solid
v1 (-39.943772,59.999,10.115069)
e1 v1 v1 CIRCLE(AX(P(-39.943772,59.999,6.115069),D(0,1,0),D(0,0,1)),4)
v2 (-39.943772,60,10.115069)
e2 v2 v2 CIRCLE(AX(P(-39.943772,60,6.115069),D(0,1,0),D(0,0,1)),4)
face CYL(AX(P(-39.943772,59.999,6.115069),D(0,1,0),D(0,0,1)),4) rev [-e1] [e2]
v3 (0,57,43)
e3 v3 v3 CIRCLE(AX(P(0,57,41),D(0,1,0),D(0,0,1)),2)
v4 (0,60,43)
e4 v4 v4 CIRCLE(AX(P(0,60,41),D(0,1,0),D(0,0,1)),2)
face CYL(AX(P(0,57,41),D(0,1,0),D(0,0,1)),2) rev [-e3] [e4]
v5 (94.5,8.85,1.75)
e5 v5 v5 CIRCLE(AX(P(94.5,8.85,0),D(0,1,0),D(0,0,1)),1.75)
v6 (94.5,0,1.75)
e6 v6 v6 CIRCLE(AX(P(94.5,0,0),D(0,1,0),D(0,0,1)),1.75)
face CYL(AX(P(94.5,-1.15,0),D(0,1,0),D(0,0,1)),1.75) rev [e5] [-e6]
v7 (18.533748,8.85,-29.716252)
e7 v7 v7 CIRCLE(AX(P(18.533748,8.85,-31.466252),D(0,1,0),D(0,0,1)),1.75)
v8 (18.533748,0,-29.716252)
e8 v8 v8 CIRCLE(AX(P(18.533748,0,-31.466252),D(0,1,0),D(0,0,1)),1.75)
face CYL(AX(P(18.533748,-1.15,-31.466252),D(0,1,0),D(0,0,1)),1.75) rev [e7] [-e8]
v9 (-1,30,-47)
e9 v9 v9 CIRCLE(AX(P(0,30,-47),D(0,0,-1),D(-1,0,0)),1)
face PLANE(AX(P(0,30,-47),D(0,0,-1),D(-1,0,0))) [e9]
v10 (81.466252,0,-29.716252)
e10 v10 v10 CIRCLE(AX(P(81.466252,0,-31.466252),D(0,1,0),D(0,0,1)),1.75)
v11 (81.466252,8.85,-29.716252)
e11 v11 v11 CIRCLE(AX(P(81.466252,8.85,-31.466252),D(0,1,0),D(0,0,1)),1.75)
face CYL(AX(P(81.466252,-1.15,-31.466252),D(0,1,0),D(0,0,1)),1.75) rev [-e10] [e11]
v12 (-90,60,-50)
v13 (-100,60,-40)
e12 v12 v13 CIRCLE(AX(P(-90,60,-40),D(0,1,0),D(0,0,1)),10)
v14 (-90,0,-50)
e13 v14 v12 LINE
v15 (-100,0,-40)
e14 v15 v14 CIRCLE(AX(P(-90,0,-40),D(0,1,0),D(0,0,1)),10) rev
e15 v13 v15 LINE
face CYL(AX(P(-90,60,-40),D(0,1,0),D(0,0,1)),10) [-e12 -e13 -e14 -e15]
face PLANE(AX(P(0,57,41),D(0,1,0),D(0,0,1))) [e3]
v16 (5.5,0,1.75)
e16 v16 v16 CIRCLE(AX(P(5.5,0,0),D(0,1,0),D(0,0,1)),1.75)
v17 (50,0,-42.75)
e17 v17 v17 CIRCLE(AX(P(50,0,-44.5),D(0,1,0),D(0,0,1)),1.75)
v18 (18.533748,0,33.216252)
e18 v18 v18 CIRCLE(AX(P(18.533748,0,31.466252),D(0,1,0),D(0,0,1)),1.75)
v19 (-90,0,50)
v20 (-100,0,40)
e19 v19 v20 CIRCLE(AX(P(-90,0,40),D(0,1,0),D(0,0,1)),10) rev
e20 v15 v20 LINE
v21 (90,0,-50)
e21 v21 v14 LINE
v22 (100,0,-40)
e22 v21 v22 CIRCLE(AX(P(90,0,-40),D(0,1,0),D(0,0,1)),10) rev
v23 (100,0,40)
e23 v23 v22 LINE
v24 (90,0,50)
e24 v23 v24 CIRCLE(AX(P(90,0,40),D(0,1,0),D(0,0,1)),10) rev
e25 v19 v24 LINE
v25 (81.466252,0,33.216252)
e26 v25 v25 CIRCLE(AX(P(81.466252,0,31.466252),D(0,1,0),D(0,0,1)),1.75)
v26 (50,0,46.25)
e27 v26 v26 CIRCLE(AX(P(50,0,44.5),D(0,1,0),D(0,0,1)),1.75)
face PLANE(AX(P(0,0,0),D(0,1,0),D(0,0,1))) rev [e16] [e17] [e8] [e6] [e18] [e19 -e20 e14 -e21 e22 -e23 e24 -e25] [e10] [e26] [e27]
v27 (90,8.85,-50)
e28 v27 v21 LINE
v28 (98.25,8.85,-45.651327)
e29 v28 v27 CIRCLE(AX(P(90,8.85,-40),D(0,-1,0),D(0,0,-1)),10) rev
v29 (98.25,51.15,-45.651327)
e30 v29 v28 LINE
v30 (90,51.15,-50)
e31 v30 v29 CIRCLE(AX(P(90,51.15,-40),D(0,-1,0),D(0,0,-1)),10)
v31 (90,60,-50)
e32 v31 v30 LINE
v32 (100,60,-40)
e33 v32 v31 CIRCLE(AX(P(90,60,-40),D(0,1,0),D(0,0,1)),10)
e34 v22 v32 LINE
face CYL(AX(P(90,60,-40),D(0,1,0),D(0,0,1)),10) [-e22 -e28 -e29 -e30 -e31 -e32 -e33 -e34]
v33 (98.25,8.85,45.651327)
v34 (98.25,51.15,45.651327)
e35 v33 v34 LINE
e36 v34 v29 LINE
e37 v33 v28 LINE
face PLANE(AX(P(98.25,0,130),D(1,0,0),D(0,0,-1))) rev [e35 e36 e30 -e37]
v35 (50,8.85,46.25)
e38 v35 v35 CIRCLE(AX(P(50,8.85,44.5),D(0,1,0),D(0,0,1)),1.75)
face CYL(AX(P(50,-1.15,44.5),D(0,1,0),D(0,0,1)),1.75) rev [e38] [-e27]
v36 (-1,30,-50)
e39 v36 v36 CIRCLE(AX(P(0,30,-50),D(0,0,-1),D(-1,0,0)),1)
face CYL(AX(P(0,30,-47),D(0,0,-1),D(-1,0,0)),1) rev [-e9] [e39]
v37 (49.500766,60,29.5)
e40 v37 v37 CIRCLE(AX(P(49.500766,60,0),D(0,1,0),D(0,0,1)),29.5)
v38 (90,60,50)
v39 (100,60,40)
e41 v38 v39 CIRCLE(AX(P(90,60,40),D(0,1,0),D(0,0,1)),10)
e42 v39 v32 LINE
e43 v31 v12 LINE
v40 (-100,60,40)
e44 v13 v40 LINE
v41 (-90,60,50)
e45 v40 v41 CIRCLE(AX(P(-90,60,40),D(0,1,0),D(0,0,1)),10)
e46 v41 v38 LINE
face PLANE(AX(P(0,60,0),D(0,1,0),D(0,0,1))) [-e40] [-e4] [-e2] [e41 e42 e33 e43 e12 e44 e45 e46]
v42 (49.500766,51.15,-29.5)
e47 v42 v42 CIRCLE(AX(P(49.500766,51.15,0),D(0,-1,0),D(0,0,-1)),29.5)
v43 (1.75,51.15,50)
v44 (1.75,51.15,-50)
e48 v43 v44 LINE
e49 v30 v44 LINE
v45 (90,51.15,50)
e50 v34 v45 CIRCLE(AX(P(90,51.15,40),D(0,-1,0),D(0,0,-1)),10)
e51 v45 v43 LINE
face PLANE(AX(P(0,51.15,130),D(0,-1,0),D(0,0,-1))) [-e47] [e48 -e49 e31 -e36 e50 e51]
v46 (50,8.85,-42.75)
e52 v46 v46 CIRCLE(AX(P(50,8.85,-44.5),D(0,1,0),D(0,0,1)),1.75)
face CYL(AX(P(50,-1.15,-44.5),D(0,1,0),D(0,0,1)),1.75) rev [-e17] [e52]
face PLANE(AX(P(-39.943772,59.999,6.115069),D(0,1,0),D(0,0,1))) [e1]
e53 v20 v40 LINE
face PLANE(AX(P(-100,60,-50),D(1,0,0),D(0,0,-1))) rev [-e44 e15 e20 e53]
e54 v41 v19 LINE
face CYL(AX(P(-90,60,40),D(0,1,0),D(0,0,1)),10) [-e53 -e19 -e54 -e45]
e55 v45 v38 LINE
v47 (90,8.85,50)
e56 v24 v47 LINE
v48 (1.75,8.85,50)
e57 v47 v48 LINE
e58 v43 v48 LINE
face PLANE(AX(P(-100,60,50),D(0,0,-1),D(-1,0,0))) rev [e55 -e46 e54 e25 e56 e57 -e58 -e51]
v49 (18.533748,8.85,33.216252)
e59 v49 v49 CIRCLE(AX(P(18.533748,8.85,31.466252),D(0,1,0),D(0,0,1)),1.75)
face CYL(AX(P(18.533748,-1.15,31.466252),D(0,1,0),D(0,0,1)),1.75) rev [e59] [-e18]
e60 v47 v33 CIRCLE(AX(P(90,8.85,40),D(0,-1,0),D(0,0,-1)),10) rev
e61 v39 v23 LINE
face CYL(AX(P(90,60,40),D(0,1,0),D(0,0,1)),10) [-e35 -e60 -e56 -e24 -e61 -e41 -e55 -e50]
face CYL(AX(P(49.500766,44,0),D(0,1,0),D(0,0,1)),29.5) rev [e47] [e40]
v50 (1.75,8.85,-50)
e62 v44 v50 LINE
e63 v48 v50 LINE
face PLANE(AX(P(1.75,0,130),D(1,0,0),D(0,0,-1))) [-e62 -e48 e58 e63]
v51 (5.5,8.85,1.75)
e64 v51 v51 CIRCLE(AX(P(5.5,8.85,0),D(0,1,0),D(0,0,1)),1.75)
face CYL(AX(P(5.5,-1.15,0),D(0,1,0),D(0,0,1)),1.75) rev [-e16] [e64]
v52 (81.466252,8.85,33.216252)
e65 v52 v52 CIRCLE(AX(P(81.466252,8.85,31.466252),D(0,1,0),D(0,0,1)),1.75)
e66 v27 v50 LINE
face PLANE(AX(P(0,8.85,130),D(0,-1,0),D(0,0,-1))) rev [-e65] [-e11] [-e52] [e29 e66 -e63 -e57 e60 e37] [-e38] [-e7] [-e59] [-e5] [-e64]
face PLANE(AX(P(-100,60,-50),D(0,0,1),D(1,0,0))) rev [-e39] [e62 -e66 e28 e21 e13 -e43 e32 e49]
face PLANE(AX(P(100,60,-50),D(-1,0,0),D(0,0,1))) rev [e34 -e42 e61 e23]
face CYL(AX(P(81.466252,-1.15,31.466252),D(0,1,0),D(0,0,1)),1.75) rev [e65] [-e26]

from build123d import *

# Parameters (mm, degrees)
SKETCH_1_W           = 200
SKETCH_1_H           = 100
EXTRUDE_2_DEPTH      = 60
SKETCH_4_W           = 96.5
SKETCH_4_H           = 42.3
CUT_EXTRUDE_7_DEPTH  = 180
SKETCH_10_R          = 2
CUT_EXTRUDE_12_DEPTH = 3
SKETCH_12_R          = 1
CUT_EXTRUDE_13_DEPTH = 3
SKETCH_16_R          = 29.5
CUT_EXTRUDE_14_DEPTH = 16
SKETCH_17_R          = 1.75
CUT_EXTRUDE_15_DEPTH = 10
SKETCH_22_R          = 4.000000002
CUT_EXTRUDE_16_DEPTH = 0.001
FILLET_1_R           = 10
FILLET_2_R           = 10
FILLET_3_R           = 10
FILLET_4_R           = 10


with BuildPart() as part:
    # 草图1 → 凸台-拉伸2 (new body)
    with BuildSketch(Plane(origin=(0, 0, 0), x_dir=(1, 0, 0), z_dir=(0, 1, 0))):
        Rectangle(SKETCH_1_W, SKETCH_1_H)
    extrude(amount=EXTRUDE_2_DEPTH)

    # 草图4 → 切除-拉伸7 (cut)
    with BuildSketch(Plane(origin=(0, 0, -50), x_dir=(-1, 0, 0), z_dir=(0, 0, -1))):
        with Locations((-50, 30)):
            Rectangle(SKETCH_4_W, SKETCH_4_H)
    extrude(amount=-CUT_EXTRUDE_7_DEPTH, mode=Mode.SUBTRACT)

    # 草图10 → 切除-拉伸12 (cut)
    with BuildSketch(Plane(origin=(0, 60, 0), x_dir=(1, 0, 0), z_dir=(0, 1, 0))):
        with Locations(Location((0, -41, 0), (0, 0, 270))):
            Circle(SKETCH_10_R)
    extrude(amount=-CUT_EXTRUDE_12_DEPTH, mode=Mode.SUBTRACT)

    # 草图12 → 切除-拉伸13 (cut)
    with BuildSketch(Plane(origin=(0, 0, -50), x_dir=(-1, 0, 0), z_dir=(0, 0, -1))):
        with Locations((0, 30)):
            Circle(SKETCH_12_R)
    extrude(amount=-CUT_EXTRUDE_13_DEPTH, mode=Mode.SUBTRACT)

    # 草图16 → 切除-拉伸14 (cut)
    with BuildSketch(Plane(origin=(0, 60, 0), x_dir=(1, 0, 0), z_dir=(0, 1, 0))):
        with Locations(Location((49.50076584, 0, 0), (0, 0, 270))):
            Circle(SKETCH_16_R)
    extrude(amount=-CUT_EXTRUDE_14_DEPTH, mode=Mode.SUBTRACT)

    # 草图17 → 切除-拉伸15 (cut)
    with BuildSketch(Plane(origin=(0, 8.85, 0), x_dir=(1, 0, 0), z_dir=(0, 1, 0))):
        with Locations(Location((50, -44.5, 0), (0, 0, 270))):
            Circle(SKETCH_17_R)
        with Locations(Location((18.533748237, -31.466251763, 0), (0, 0, 270))):
            Circle(SKETCH_17_R)
        with Locations(Location((5.5, 0, 0), (0, 0, 270))):
            Circle(SKETCH_17_R)
        with Locations(Location((18.533748237, 31.466251763, 0), (0, 0, 270))):
            Circle(SKETCH_17_R)
        with Locations(Location((50, 44.5, 0), (0, 0, 270))):
            Circle(SKETCH_17_R)
        with Locations(Location((81.466251763, 31.466251763, 0), (0, 0, 270))):
            Circle(SKETCH_17_R)
        with Locations(Location((94.5, 0, 0), (0, 0, 270))):
            Circle(SKETCH_17_R)
        with Locations(Location((81.466251763, -31.466251763, 0), (0, 0, 270))):
            Circle(SKETCH_17_R)
    extrude(amount=-CUT_EXTRUDE_15_DEPTH, mode=Mode.SUBTRACT)

    # 草图22 → 切除-拉伸16 (cut)
    with BuildSketch(Plane(origin=(0, 60, 0), x_dir=(1, 0, 0), z_dir=(0, 1, 0))):
        with Locations(Location((-39.943771533, -6.115069491, 0), (0, 0, 270))):
            Circle(SKETCH_22_R)
    extrude(amount=-CUT_EXTRUDE_16_DEPTH, mode=Mode.SUBTRACT)

    # 圆角1
    fillet_1_edges = [part.edges().sort_by_distance(p)[0] for p in [
        (-100, 30, -50),
    ]]
    fillet(fillet_1_edges, radius=FILLET_1_R)

    # 圆角2
    fillet_2_edges = [part.edges().sort_by_distance(p)[0] for p in [
        (-100, 30, 50),
    ]]
    fillet(fillet_2_edges, radius=FILLET_2_R)

    # 圆角3
    # the kernel refuses this fillet: 10 mm, written as the material it takes off along each edge
    with BuildSketch(Plane(origin=(100, -25, 50), x_dir=(-1, 0, 0), z_dir=(0, 1, 0))) as fillet_3_piece_1:
        with BuildLine():
            CenterArc((FILLET_3_R, -FILLET_3_R), FILLET_3_R, 90, 90)
            Line((0, -FILLET_3_R), (0, 0))
            Line((0, 0), (FILLET_3_R, 0))
        make_face()
    extrude(amount=110, mode=Mode.SUBTRACT)

    # 圆角4
    # the kernel refuses this fillet: 10 mm, written as the material it takes off along each edge
    with BuildSketch(Plane(origin=(100, -25, -50), x_dir=(0, 0, 1), z_dir=(0, 1, 0))) as fillet_4_piece_1:
        with BuildLine():
            CenterArc((FILLET_4_R, -FILLET_4_R), FILLET_4_R, 90, 90)
            Line((0, -FILLET_4_R), (0, 0))
            Line((0, 0), (FILLET_4_R, 0))
        make_face()
    extrude(amount=110, mode=Mode.SUBTRACT)


solid = part.part
